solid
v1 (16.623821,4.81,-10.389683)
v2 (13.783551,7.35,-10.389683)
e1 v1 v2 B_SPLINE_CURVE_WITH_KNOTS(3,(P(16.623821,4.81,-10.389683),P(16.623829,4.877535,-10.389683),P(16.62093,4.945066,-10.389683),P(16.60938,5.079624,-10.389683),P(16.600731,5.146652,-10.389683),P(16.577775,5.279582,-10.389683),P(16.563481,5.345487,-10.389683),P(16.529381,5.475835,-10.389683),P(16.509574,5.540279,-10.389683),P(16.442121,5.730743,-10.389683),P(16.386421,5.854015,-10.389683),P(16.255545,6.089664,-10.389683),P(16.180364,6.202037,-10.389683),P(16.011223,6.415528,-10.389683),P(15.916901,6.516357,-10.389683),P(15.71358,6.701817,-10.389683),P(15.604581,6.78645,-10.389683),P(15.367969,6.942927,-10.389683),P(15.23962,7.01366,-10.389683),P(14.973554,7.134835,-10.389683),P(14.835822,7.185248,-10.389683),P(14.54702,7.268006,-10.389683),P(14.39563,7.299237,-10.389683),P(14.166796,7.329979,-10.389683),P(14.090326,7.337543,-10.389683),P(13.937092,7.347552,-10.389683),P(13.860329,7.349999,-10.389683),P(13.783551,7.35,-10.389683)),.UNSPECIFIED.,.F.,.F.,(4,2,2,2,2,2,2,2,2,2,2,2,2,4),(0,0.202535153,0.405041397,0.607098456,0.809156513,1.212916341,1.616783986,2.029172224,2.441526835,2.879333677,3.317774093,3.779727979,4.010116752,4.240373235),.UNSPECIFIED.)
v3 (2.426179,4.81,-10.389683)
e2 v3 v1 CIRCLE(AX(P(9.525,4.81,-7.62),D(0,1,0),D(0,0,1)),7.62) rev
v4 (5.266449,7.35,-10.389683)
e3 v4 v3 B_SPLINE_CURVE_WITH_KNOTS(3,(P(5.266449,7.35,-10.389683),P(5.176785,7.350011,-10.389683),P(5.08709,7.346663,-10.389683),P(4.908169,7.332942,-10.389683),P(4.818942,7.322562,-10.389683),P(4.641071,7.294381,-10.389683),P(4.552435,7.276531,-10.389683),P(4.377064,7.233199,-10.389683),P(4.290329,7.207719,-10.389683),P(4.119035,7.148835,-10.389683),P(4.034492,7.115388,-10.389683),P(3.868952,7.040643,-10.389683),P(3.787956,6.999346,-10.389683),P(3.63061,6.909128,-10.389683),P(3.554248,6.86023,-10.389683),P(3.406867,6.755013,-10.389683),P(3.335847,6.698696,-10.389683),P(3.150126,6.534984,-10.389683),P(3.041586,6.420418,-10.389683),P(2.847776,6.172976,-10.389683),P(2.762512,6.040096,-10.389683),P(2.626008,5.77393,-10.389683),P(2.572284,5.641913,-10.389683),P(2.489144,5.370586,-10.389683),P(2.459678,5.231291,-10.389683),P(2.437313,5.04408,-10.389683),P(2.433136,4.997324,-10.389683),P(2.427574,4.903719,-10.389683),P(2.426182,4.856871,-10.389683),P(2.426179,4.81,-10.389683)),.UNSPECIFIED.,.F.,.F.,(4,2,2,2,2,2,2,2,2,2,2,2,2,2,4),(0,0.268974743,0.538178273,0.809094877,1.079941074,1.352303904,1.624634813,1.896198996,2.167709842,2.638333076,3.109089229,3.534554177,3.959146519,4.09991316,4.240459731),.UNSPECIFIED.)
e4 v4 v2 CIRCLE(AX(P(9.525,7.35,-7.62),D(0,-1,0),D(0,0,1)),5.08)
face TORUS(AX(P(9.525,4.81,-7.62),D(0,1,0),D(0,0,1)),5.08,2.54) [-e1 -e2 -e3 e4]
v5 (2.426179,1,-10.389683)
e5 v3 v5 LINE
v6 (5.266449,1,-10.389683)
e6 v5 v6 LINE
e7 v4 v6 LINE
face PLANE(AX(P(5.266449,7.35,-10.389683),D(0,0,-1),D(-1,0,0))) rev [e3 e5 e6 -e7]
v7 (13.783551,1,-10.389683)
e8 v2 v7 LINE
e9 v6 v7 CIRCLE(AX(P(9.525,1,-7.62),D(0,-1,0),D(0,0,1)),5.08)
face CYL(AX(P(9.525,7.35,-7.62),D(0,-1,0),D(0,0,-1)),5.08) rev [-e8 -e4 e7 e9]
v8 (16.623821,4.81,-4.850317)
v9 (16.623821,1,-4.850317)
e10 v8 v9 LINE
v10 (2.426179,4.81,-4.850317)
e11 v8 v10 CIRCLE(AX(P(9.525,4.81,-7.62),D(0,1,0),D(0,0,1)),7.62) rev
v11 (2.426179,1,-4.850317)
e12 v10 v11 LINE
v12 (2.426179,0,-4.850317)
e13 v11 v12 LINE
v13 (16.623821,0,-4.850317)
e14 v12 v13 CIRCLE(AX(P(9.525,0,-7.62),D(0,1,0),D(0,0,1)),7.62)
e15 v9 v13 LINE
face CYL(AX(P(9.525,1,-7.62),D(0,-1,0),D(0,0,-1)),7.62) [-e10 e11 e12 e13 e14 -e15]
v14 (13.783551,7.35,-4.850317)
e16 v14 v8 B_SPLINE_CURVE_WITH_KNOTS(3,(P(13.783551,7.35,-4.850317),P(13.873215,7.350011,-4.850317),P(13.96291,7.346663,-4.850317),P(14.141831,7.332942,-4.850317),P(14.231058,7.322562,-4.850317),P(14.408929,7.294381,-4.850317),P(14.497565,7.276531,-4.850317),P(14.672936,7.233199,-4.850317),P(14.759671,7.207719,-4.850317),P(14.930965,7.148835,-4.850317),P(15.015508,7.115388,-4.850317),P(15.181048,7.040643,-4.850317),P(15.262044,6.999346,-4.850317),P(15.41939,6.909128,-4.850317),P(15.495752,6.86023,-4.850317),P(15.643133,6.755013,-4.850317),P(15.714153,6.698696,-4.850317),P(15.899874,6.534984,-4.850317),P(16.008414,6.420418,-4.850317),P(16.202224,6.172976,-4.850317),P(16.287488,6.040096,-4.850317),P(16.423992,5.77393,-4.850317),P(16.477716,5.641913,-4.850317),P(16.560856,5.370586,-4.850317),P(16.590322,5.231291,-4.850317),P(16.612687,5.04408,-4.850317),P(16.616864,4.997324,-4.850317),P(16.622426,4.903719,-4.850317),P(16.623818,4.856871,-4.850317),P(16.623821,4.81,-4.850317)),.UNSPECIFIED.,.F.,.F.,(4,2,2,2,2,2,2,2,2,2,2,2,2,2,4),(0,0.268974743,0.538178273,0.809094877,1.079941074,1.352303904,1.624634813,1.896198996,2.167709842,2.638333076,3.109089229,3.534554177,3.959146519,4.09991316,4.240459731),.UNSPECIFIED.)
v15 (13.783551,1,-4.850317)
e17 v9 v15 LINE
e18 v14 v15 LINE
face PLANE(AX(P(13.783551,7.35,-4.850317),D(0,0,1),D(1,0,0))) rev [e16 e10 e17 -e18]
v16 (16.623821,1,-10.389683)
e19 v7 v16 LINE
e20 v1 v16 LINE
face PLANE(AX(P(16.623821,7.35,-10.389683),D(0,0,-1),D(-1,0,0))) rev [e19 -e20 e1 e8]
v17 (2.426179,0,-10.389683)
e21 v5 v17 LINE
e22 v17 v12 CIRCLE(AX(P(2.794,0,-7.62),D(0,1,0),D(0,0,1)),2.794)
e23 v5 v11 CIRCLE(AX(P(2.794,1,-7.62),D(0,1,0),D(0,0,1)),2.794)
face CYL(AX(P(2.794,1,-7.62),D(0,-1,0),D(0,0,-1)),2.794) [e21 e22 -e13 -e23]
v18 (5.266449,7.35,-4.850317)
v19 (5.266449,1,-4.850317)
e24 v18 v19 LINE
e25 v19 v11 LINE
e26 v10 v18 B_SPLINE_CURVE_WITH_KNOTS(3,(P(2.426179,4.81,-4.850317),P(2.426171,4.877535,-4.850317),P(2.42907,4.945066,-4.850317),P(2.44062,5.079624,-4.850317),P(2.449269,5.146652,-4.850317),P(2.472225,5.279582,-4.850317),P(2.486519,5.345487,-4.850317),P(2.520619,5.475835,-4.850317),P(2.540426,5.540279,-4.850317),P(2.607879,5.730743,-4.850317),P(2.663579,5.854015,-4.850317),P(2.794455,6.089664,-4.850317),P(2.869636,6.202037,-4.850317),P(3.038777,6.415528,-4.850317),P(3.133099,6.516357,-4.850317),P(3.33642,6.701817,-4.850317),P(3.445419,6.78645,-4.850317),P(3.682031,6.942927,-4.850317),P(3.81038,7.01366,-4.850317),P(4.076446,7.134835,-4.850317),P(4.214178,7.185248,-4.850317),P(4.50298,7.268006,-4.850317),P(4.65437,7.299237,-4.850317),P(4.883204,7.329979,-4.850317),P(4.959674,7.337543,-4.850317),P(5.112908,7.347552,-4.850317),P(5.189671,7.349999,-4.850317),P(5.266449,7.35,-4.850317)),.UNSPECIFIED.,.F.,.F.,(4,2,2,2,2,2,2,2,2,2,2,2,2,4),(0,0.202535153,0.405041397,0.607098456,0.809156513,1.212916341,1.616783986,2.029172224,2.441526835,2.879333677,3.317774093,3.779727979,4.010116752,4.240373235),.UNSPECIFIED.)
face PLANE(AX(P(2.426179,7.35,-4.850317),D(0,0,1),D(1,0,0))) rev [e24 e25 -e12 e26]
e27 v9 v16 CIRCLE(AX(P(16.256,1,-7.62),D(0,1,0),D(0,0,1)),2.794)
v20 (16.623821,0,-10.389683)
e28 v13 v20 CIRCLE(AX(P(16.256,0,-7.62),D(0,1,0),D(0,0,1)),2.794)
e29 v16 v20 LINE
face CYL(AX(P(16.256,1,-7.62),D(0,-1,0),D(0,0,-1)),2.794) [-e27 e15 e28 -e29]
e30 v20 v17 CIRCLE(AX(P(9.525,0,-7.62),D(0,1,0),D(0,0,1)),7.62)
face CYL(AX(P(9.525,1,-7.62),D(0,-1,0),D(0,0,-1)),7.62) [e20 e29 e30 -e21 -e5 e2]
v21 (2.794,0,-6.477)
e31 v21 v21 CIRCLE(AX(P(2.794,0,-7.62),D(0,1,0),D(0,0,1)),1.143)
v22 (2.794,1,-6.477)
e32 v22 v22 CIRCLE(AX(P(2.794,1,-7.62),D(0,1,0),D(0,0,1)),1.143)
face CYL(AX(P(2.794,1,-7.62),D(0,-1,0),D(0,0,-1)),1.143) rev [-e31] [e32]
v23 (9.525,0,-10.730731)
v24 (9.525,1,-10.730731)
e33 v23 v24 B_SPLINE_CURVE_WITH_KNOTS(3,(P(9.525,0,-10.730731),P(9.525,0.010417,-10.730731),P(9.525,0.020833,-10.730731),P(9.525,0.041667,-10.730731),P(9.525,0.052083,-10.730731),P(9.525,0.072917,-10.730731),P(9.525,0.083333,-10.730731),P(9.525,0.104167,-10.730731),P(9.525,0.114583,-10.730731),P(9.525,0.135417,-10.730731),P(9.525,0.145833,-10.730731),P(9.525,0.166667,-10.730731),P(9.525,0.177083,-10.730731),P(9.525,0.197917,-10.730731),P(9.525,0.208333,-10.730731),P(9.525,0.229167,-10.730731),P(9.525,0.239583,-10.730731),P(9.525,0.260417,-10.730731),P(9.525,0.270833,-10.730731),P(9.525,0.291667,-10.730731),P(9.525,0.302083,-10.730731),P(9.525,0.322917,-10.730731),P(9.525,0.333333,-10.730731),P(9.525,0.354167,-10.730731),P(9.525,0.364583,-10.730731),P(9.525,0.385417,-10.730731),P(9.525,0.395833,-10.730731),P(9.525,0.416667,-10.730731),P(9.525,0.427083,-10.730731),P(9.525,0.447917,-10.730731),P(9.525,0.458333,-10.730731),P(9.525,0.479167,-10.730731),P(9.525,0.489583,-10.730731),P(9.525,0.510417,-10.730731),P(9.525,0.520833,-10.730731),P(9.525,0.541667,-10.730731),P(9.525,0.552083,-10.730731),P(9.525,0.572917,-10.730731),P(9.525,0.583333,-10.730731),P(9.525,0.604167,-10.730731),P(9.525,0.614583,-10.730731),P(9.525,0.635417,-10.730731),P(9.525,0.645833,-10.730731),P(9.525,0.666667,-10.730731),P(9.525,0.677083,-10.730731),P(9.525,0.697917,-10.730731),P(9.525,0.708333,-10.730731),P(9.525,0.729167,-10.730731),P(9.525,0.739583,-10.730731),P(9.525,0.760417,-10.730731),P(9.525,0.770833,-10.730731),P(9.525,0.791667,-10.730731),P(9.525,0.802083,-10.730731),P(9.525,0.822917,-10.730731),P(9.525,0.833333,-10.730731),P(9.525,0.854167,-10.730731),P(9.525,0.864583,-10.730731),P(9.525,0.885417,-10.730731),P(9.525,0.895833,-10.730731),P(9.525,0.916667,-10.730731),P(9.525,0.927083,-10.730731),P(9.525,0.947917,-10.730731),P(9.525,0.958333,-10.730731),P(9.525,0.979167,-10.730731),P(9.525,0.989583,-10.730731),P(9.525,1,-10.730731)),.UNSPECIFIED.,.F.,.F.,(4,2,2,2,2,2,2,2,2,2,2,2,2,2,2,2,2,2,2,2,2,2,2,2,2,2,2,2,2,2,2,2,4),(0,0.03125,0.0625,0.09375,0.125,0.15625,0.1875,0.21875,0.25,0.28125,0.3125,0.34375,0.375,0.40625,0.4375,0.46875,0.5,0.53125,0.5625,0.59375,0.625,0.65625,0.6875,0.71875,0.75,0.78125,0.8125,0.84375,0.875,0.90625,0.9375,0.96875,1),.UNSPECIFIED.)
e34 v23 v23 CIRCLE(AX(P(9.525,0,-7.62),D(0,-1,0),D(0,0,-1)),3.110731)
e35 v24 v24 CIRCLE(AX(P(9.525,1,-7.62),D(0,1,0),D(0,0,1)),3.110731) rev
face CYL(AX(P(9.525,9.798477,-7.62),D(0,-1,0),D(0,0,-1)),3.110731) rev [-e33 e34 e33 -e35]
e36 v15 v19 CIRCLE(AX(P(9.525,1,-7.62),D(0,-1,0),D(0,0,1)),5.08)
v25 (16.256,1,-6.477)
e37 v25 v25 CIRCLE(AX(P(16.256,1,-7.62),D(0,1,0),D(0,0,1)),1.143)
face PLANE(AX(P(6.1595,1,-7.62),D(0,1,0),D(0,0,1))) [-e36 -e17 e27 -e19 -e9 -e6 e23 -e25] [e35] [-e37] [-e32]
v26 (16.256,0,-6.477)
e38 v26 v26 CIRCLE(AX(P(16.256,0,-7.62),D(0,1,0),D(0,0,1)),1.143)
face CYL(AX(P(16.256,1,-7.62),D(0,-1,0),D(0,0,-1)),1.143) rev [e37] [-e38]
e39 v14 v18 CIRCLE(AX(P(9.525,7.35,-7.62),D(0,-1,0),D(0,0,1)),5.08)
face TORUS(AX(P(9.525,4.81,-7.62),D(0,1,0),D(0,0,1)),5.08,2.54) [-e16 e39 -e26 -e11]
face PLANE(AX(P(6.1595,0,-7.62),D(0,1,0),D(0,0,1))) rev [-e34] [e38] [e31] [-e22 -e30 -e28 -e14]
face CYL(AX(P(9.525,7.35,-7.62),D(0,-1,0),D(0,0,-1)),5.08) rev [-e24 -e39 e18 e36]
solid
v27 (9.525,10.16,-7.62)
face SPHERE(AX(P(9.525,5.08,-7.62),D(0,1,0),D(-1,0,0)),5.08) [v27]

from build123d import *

# Parameters (mm, degrees)
SKETCH1_R           = 1.143
BOSS_EXTRUDE1_DEPTH = 1
BOSS_EXTRUDE2_DEPTH = 6.35
SKETCH4_R           = 3.110731253
CUT_EXTRUDE3_DEPTH  = 1
FILLET1_R           = 2.54


with BuildPart() as part:
    # Sketch1 → Boss-Extrude1 (new body)
    with BuildSketch(Plane(origin=(0, 0, 0), x_dir=(1, 0, 0), z_dir=(0, 1, 0))):
        with BuildLine():
            ThreePointArc((2.426179245, 10.389682995), (0, 7.62), (2.426179245, 4.850317005))
            ThreePointArc((2.426179245, 4.850317005), (9.525, 0), (16.623820755, 4.850317005))
            ThreePointArc((16.623820755, 4.850317005), (19.05, 7.62), (16.623820755, 10.389682995))
            ThreePointArc((16.623820755, 10.389682995), (9.525, 15.24), (2.426179245, 10.389682995))
        make_face()
        with Locations(Location((16.256, 7.62, 0), (0, 0, 270))):
            Circle(SKETCH1_R, mode=Mode.SUBTRACT)
        with Locations(Location((2.794, 7.62, 0), (0, 0, 270))):
            Circle(SKETCH1_R, mode=Mode.SUBTRACT)
    extrude(amount=BOSS_EXTRUDE1_DEPTH)

    # Sketch2 → Boss-Extrude2 (add)
    with BuildSketch(Plane(origin=(0, 1, 0), x_dir=(1, 0, 0), z_dir=(0, 1, 0))):
        with BuildLine():
            Line((2.426179245, 4.850317005), (5.26644906, 4.850317005))
            ThreePointArc((5.26644906, 4.850317005), (9.525, 2.54), (13.78355094, 4.850317005))
            Line((13.78355094, 4.850317005), (16.623820755, 4.850317005))
            ThreePointArc((16.623820755, 4.850317005), (9.525, 0), (2.426179245, 4.850317005))
        make_face()
        with BuildLine():
            Line((16.623820755, 10.389682995), (13.78355094, 10.389682995))
            ThreePointArc((13.78355094, 10.389682995), (9.525, 12.7), (5.26644906, 10.389682995))
            Line((5.26644906, 10.389682995), (2.426179245, 10.389682995))
            ThreePointArc((2.426179245, 10.389682995), (9.525, 15.24), (16.623820755, 10.389682995))
        make_face()
    extrude(amount=BOSS_EXTRUDE2_DEPTH)

    # Sketch4 → Cut-Extrude3 (cut)
    with BuildSketch(Plane.XZ):
        with Locations(Location((9.525, -7.62, 0), (0, 0, 270))):
            Circle(SKETCH4_R)
    extrude(amount=-CUT_EXTRUDE3_DEPTH, mode=Mode.SUBTRACT)

    # Fillet1
    fillet1_edges = [part.edges().sort_by_distance(p)[0] for p in [
        (9.525, 7.35, 0),
        (9.525, 7.35, -15.24),
    ]]
    fillet(fillet1_edges, radius=FILLET1_R - 0.0001)  # a hair under: the kernel refuses the full size


with BuildPart() as body_2:
    # Sketch3 → Revolve3 (revolve)
    with BuildSketch(Plane(origin=(0, 0, -7.62), x_dir=(-1, 0, 0), z_dir=(0, 0, -1))):
        with BuildLine():
            Line((-9.525, 0), (-9.525, 10.16))
            ThreePointArc((-9.525, 10.16), (-4.445, 5.08), (-9.525, 0))
        make_face()
    revolve(axis=Axis((9.525, 10.16, -7.62), (0, -1, 0)))


solid = Compound([part.part, body_2.part])
